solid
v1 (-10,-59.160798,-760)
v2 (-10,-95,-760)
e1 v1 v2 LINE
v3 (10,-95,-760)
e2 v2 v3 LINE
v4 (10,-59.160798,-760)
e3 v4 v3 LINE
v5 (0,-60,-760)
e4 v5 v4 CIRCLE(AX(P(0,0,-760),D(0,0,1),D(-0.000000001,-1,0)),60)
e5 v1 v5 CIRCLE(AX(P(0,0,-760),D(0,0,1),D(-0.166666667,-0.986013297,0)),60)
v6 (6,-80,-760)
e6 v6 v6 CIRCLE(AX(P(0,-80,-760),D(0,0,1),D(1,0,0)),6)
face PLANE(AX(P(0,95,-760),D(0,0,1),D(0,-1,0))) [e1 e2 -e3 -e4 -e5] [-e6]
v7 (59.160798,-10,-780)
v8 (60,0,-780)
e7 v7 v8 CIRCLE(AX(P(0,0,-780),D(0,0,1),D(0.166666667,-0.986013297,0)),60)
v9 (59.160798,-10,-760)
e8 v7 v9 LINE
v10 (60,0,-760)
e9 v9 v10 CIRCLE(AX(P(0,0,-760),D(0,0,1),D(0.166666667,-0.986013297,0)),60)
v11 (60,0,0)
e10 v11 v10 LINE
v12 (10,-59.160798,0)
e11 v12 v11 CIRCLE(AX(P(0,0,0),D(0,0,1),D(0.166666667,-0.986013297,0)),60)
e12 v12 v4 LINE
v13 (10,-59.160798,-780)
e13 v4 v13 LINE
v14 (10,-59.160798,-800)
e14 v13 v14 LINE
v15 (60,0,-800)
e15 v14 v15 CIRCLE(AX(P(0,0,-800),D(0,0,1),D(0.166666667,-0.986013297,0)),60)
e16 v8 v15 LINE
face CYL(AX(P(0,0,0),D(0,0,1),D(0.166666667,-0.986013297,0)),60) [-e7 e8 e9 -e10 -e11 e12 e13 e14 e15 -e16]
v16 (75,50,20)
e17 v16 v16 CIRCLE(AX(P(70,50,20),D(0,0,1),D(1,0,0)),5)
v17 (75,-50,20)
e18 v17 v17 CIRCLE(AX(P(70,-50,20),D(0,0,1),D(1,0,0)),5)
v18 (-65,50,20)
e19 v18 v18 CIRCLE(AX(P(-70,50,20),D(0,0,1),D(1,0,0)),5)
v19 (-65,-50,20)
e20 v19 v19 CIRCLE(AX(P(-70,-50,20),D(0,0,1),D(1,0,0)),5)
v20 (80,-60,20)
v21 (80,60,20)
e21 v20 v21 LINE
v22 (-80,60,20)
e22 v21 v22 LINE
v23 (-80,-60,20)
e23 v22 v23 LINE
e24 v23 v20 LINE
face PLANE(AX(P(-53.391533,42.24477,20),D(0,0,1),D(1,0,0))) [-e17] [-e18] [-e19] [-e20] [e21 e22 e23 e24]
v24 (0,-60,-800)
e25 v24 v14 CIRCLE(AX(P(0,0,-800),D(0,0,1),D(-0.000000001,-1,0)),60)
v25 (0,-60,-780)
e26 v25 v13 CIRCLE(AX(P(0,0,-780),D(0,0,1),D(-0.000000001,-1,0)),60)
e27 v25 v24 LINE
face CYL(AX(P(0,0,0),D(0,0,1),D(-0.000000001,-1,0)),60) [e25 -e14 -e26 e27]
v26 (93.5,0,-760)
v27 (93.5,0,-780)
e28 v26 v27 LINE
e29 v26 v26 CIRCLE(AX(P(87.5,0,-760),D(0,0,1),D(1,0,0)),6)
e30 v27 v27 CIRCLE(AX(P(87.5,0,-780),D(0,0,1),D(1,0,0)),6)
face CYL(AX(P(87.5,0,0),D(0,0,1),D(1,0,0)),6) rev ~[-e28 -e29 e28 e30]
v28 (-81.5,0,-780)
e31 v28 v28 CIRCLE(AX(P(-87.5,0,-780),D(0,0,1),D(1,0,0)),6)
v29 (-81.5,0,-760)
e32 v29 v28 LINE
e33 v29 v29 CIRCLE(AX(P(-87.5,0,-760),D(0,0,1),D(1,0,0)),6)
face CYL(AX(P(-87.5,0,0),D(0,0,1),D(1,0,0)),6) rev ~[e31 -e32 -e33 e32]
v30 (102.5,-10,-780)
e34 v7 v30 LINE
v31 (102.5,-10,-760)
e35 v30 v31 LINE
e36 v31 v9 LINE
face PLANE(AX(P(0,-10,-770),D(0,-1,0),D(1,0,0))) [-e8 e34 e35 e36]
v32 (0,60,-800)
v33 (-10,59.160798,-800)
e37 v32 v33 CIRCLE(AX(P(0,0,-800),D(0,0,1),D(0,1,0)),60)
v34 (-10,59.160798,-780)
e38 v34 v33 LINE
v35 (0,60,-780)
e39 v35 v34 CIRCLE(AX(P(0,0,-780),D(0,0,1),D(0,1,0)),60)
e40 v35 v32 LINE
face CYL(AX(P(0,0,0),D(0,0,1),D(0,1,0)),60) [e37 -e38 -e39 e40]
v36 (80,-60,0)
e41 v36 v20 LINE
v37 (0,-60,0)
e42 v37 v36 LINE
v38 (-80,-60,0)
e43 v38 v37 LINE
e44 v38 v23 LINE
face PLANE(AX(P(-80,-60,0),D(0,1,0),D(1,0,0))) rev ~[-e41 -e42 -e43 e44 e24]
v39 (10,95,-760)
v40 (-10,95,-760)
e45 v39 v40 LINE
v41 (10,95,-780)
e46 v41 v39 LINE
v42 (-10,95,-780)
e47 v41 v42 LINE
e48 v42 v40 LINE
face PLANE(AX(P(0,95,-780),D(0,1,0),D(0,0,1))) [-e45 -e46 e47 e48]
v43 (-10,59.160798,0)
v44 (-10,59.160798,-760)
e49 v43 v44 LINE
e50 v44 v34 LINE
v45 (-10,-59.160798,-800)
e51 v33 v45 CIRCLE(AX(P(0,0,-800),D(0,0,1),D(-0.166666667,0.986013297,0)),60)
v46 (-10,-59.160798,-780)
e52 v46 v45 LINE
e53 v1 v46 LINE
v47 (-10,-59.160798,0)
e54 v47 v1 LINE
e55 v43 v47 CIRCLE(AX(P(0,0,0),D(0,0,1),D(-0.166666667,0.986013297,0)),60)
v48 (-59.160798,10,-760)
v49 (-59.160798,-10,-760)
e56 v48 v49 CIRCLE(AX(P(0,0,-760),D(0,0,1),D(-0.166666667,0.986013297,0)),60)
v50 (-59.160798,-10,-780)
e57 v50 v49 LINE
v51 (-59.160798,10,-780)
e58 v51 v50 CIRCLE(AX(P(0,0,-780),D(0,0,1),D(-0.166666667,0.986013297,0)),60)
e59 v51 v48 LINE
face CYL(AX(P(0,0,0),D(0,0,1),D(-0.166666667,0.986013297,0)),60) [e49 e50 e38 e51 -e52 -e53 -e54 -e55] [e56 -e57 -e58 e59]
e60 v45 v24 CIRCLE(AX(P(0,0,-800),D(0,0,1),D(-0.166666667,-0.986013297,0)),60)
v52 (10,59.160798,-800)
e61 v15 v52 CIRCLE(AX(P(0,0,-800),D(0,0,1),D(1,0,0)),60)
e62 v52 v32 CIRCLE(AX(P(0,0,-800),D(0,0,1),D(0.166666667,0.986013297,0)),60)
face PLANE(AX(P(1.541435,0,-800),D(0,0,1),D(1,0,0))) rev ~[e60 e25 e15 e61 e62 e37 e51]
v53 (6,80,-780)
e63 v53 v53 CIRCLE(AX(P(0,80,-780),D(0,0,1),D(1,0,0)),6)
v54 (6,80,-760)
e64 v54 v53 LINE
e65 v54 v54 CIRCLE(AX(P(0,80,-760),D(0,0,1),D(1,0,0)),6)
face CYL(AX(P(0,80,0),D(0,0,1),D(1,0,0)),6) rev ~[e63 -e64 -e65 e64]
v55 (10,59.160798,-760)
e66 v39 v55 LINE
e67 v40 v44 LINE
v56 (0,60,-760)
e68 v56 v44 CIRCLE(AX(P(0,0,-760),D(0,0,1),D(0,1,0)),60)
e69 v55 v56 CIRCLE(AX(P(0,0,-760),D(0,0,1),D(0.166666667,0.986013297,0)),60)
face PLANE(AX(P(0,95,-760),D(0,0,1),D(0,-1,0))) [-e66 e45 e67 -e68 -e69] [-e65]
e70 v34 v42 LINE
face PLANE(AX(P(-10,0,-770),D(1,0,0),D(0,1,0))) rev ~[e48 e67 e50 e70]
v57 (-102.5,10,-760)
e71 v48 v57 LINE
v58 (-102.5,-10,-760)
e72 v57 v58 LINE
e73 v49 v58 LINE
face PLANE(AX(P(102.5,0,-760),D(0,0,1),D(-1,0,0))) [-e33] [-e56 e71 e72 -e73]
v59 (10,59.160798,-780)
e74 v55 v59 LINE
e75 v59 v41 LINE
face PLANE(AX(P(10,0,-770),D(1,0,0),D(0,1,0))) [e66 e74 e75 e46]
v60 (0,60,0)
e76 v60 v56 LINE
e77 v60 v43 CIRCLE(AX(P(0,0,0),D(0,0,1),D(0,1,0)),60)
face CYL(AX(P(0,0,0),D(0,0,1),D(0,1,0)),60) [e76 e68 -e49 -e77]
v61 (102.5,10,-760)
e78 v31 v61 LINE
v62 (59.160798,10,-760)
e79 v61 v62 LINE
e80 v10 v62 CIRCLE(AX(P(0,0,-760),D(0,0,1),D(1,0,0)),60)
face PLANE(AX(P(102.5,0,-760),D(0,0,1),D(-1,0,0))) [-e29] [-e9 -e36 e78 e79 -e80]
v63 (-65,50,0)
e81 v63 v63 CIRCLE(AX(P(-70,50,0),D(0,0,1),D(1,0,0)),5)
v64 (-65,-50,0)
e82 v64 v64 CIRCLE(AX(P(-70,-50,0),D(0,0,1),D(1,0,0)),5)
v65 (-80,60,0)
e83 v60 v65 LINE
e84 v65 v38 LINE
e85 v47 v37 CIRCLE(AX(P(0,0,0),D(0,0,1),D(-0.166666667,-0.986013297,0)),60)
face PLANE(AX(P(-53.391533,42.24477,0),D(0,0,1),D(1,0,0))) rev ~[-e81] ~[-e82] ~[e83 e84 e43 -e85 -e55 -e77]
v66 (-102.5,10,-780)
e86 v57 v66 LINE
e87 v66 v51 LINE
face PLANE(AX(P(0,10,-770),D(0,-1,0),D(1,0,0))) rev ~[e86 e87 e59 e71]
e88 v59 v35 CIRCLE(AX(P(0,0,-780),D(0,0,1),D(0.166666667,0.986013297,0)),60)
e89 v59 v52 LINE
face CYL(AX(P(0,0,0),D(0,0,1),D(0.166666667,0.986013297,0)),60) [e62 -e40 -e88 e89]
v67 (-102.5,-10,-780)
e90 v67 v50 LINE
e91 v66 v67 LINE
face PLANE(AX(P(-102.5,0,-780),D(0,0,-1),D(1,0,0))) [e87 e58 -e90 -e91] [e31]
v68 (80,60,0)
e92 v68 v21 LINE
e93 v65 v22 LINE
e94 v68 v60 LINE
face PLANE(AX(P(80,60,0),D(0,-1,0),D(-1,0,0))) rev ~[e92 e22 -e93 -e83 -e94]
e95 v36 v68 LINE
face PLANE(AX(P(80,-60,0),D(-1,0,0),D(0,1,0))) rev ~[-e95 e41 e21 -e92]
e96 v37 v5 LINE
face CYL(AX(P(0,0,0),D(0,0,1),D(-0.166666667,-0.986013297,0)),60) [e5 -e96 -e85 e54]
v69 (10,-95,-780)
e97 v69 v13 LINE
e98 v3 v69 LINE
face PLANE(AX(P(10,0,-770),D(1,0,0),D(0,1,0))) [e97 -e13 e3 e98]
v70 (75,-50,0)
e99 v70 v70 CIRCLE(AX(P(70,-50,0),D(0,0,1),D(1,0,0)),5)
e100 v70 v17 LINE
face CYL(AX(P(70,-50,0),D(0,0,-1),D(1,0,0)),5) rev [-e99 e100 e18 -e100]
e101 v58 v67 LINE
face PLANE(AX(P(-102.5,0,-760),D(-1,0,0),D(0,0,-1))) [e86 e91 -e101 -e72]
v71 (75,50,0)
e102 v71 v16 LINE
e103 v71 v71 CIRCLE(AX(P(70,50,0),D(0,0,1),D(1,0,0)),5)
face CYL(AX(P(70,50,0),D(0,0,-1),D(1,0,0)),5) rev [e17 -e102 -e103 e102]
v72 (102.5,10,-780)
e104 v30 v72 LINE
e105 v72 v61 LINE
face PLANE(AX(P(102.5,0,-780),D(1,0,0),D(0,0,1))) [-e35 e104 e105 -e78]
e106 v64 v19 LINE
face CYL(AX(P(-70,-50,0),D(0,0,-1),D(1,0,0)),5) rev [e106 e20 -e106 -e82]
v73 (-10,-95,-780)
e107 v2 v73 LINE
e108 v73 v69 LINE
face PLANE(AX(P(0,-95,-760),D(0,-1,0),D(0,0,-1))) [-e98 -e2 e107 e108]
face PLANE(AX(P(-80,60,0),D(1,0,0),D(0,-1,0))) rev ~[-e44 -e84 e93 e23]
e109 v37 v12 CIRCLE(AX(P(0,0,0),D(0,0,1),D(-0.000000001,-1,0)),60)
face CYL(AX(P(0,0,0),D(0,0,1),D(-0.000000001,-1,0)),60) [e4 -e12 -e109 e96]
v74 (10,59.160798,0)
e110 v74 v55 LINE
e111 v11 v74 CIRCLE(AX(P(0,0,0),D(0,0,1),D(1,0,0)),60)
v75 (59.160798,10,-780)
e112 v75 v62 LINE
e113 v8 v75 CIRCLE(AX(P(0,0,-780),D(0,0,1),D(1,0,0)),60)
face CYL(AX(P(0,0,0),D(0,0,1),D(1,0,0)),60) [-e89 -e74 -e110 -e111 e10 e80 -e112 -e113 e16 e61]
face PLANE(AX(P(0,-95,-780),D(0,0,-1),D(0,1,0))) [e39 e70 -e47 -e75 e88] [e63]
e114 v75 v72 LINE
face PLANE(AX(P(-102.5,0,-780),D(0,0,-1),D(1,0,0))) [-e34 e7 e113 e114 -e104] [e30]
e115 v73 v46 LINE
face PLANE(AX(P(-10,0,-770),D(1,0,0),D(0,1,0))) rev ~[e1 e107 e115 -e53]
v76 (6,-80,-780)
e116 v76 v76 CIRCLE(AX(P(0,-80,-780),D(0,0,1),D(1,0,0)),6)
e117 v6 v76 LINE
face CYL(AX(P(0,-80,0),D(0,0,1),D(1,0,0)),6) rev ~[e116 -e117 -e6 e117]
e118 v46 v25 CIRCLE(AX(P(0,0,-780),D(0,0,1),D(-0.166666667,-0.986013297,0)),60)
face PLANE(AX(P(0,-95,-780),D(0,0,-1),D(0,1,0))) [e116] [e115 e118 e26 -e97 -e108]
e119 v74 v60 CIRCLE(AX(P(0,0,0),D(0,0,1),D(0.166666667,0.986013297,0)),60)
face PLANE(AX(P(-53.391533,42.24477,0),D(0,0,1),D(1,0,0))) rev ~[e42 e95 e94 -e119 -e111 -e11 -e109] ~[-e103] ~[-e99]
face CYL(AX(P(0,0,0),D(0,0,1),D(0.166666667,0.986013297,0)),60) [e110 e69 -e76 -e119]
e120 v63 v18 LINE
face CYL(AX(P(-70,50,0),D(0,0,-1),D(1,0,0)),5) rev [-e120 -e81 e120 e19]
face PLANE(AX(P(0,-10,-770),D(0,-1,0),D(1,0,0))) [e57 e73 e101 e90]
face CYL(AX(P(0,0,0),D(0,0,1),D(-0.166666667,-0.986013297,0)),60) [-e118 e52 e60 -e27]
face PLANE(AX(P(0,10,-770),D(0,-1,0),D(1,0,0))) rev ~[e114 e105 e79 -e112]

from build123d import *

# Parameters (mm, degrees)
F0_R     = 5
F1_DEPTH = 20
F2_DEPTH = 800
F5_DEPTH = 10
F6_DEPTH = 10
F0_R_2   = 6
F7_DEPTH = 956


# Not quite as in the source:
# - a feature names something its author has since deleted; it is built from what else it names


with BuildPart() as f1:
    # F0 (on Top) → F1 (new body)
    with BuildSketch(Plane.XY):
        with BuildLine():
            ThreePointArc((-59.160797831, 10), (-42.4264068712, 42.4264068712), (-10, 59.160797831))
            Line((-10, 59.160797831), (-10, 60))
            Line((-10, 60), (-80, 60))
            Line((-80, 60), (-80, 10))
            Line((-80, 10), (-59.160797831, 10))
        make_face()
        with Locations((-70, 50)):
            Circle(F0_R, mode=Mode.SUBTRACT)
        with BuildLine():
            ThreePointArc((59.160797831, -10), (59.7898313673, -5.0175756168), (60, 0))
            ThreePointArc((60, 0), (59.7898313673, 5.0175756168), (59.160797831, 10))
            ThreePointArc((59.160797831, 10), (42.4264068712, 42.4264068712), (10, 59.160797831))
            ThreePointArc((10, 59.160797831), (5.0175756193, 59.7898313671), (5e-09, 60))
            ThreePointArc((5e-09, 60), (-5.0175756143, 59.7898313675), (-10, 59.160797831))
            ThreePointArc((-10, 59.160797831), (-42.4264068712, 42.4264068712), (-59.160797831, 10))
            ThreePointArc((-59.160797831, 10), (-60, 0), (-59.160797831, -10))
            ThreePointArc((-59.160797831, -10), (-42.4264068712, -42.4264068712), (-10, -59.160797831))
            ThreePointArc((-10, -59.160797831), (-5.0175756489, -59.7898313646), (-6.44e-08, -60))
            ThreePointArc((-6.44e-08, -60), (5.0175755847, -59.78983137), (10, -59.160797831))
            ThreePointArc((10, -59.160797831), (42.4264068712, -42.4264068712), (59.160797831, -10))
        make_face()
        with BuildLine():
            ThreePointArc((10, 59.160797831), (42.4264068712, 42.4264068712), (59.160797831, 10))
            Line((59.160797831, 10), (80, 10))
            Line((80, 10), (80, 60))
            Line((80, 60), (10, 60))
            Line((10, 60), (10, 59.160797831))
        make_face()
        with Locations((70, 50)):
            Circle(F0_R, mode=Mode.SUBTRACT)
        with BuildLine():
            ThreePointArc((59.160797831, 10), (59.7898313673, 5.0175756168), (60, 0))
            ThreePointArc((60, 0), (59.7898313673, -5.0175756168), (59.160797831, -10))
            Line((59.160797831, -10), (80, -10))
            Line((80, -10), (80, 10))
            Line((80, 10), (59.160797831, 10))
        make_face()
        with BuildLine():
            Line((80, -10), (59.160797831, -10))
            ThreePointArc((59.160797831, -10), (42.4264068712, -42.4264068712), (10, -59.160797831))
            Line((10, -59.160797831), (10, -60))
            Line((10, -60), (80, -60))
            Line((80, -60), (80, -10))
        make_face()
        with Locations((70, -50)):
            Circle(F0_R, mode=Mode.SUBTRACT)
        with BuildLine():
            ThreePointArc((-59.160797831, -10), (-60, 0), (-59.160797831, 10))
            Line((-59.160797831, 10), (-80, 10))
            Line((-80, 10), (-80, -10))
            Line((-80, -10), (-59.160797831, -10))
        make_face()
        with BuildLine():
            Line((-10, -60), (-10, -59.160797831))
            ThreePointArc((-10, -59.160797831), (-42.4264068712, -42.4264068712), (-59.160797831, -10))
            Line((-59.160797831, -10), (-80, -10))
            Line((-80, -10), (-80, -60))
            Line((-80, -60), (-10, -60))
        make_face()
        with Locations((-70, -50)):
            Circle(F0_R, mode=Mode.SUBTRACT)
        with BuildLine():
            Line((-10, -60), (-6.44e-08, -60))
            ThreePointArc((-6.44e-08, -60), (-5.0175756489, -59.7898313646), (-10, -59.160797831))
            Line((-10, -59.160797831), (-10, -60))
        make_face()
        with BuildLine():
            Line((10, -60), (10, -59.160797831))
            ThreePointArc((10, -59.160797831), (5.0175755847, -59.78983137), (-6.44e-08, -60))
            Line((-6.44e-08, -60), (10, -60))
        make_face()
        with BuildLine():
            ThreePointArc((-10, 59.160797831), (-5.0175756143, 59.7898313675), (5e-09, 60))
            Line((5e-09, 60), (-10, 60))
            Line((-10, 60), (-10, 59.160797831))
        make_face()
        with BuildLine():
            ThreePointArc((5e-09, 60), (5.0175756193, 59.7898313671), (10, 59.160797831))
            Line((10, 59.160797831), (10, 60))
            Line((10, 60), (5e-09, 60))
        make_face()
    extrude(amount=F1_DEPTH)

    # F0 (on Top) → F2 (join)
    with BuildSketch(Plane.XY):
        with BuildLine():
            ThreePointArc((59.160797831, -10), (59.7898313673, -5.0175756168), (60, 0))
            ThreePointArc((60, 0), (59.7898313673, 5.0175756168), (59.160797831, 10))
            ThreePointArc((59.160797831, 10), (42.4264068712, 42.4264068712), (10, 59.160797831))
            ThreePointArc((10, 59.160797831), (5.0175756193, 59.7898313671), (5e-09, 60))
            ThreePointArc((5e-09, 60), (-5.0175756143, 59.7898313675), (-10, 59.160797831))
            ThreePointArc((-10, 59.160797831), (-42.4264068712, 42.4264068712), (-59.160797831, 10))
            ThreePointArc((-59.160797831, 10), (-60, 0), (-59.160797831, -10))
            ThreePointArc((-59.160797831, -10), (-42.4264068712, -42.4264068712), (-10, -59.160797831))
            ThreePointArc((-10, -59.160797831), (-5.0175756489, -59.7898313646), (-6.44e-08, -60))
            ThreePointArc((-6.44e-08, -60), (5.0175755847, -59.78983137), (10, -59.160797831))
            ThreePointArc((10, -59.160797831), (42.4264068712, -42.4264068712), (59.160797831, -10))
        make_face()
    extrude(amount=-F2_DEPTH)

    # F4 (on Right) → F5 (join, symmetric)
    with BuildSketch(Plane.YZ):
        Polygon((95, -760), (0, -760), (-95, -760), (-95, -780), (95, -780), align=None)
    extrude(amount=F5_DEPTH, both=True)

    # F3 (on Front) → F6 (join, symmetric)
    with BuildSketch(Plane.XZ):
        Polygon((102.5, -760), (0, -760), (-102.5, -760), (-102.5, -780), (102.5, -780), align=None)
    extrude(amount=F6_DEPTH, both=True)

    # F0 (on Top) → F7 (cut)
    with BuildSketch(Plane.XY):
        with Locations((0, 80)):
            Circle(F0_R_2)
        with Locations((0, -80)):
            Circle(F0_R_2)
        with Locations((87.5, 0)):
            Circle(F0_R_2)
        with Locations((-87.5, 0)):
            Circle(F0_R_2)
    extrude(amount=-F7_DEPTH, mode=Mode.SUBTRACT)


solid = f1.part
